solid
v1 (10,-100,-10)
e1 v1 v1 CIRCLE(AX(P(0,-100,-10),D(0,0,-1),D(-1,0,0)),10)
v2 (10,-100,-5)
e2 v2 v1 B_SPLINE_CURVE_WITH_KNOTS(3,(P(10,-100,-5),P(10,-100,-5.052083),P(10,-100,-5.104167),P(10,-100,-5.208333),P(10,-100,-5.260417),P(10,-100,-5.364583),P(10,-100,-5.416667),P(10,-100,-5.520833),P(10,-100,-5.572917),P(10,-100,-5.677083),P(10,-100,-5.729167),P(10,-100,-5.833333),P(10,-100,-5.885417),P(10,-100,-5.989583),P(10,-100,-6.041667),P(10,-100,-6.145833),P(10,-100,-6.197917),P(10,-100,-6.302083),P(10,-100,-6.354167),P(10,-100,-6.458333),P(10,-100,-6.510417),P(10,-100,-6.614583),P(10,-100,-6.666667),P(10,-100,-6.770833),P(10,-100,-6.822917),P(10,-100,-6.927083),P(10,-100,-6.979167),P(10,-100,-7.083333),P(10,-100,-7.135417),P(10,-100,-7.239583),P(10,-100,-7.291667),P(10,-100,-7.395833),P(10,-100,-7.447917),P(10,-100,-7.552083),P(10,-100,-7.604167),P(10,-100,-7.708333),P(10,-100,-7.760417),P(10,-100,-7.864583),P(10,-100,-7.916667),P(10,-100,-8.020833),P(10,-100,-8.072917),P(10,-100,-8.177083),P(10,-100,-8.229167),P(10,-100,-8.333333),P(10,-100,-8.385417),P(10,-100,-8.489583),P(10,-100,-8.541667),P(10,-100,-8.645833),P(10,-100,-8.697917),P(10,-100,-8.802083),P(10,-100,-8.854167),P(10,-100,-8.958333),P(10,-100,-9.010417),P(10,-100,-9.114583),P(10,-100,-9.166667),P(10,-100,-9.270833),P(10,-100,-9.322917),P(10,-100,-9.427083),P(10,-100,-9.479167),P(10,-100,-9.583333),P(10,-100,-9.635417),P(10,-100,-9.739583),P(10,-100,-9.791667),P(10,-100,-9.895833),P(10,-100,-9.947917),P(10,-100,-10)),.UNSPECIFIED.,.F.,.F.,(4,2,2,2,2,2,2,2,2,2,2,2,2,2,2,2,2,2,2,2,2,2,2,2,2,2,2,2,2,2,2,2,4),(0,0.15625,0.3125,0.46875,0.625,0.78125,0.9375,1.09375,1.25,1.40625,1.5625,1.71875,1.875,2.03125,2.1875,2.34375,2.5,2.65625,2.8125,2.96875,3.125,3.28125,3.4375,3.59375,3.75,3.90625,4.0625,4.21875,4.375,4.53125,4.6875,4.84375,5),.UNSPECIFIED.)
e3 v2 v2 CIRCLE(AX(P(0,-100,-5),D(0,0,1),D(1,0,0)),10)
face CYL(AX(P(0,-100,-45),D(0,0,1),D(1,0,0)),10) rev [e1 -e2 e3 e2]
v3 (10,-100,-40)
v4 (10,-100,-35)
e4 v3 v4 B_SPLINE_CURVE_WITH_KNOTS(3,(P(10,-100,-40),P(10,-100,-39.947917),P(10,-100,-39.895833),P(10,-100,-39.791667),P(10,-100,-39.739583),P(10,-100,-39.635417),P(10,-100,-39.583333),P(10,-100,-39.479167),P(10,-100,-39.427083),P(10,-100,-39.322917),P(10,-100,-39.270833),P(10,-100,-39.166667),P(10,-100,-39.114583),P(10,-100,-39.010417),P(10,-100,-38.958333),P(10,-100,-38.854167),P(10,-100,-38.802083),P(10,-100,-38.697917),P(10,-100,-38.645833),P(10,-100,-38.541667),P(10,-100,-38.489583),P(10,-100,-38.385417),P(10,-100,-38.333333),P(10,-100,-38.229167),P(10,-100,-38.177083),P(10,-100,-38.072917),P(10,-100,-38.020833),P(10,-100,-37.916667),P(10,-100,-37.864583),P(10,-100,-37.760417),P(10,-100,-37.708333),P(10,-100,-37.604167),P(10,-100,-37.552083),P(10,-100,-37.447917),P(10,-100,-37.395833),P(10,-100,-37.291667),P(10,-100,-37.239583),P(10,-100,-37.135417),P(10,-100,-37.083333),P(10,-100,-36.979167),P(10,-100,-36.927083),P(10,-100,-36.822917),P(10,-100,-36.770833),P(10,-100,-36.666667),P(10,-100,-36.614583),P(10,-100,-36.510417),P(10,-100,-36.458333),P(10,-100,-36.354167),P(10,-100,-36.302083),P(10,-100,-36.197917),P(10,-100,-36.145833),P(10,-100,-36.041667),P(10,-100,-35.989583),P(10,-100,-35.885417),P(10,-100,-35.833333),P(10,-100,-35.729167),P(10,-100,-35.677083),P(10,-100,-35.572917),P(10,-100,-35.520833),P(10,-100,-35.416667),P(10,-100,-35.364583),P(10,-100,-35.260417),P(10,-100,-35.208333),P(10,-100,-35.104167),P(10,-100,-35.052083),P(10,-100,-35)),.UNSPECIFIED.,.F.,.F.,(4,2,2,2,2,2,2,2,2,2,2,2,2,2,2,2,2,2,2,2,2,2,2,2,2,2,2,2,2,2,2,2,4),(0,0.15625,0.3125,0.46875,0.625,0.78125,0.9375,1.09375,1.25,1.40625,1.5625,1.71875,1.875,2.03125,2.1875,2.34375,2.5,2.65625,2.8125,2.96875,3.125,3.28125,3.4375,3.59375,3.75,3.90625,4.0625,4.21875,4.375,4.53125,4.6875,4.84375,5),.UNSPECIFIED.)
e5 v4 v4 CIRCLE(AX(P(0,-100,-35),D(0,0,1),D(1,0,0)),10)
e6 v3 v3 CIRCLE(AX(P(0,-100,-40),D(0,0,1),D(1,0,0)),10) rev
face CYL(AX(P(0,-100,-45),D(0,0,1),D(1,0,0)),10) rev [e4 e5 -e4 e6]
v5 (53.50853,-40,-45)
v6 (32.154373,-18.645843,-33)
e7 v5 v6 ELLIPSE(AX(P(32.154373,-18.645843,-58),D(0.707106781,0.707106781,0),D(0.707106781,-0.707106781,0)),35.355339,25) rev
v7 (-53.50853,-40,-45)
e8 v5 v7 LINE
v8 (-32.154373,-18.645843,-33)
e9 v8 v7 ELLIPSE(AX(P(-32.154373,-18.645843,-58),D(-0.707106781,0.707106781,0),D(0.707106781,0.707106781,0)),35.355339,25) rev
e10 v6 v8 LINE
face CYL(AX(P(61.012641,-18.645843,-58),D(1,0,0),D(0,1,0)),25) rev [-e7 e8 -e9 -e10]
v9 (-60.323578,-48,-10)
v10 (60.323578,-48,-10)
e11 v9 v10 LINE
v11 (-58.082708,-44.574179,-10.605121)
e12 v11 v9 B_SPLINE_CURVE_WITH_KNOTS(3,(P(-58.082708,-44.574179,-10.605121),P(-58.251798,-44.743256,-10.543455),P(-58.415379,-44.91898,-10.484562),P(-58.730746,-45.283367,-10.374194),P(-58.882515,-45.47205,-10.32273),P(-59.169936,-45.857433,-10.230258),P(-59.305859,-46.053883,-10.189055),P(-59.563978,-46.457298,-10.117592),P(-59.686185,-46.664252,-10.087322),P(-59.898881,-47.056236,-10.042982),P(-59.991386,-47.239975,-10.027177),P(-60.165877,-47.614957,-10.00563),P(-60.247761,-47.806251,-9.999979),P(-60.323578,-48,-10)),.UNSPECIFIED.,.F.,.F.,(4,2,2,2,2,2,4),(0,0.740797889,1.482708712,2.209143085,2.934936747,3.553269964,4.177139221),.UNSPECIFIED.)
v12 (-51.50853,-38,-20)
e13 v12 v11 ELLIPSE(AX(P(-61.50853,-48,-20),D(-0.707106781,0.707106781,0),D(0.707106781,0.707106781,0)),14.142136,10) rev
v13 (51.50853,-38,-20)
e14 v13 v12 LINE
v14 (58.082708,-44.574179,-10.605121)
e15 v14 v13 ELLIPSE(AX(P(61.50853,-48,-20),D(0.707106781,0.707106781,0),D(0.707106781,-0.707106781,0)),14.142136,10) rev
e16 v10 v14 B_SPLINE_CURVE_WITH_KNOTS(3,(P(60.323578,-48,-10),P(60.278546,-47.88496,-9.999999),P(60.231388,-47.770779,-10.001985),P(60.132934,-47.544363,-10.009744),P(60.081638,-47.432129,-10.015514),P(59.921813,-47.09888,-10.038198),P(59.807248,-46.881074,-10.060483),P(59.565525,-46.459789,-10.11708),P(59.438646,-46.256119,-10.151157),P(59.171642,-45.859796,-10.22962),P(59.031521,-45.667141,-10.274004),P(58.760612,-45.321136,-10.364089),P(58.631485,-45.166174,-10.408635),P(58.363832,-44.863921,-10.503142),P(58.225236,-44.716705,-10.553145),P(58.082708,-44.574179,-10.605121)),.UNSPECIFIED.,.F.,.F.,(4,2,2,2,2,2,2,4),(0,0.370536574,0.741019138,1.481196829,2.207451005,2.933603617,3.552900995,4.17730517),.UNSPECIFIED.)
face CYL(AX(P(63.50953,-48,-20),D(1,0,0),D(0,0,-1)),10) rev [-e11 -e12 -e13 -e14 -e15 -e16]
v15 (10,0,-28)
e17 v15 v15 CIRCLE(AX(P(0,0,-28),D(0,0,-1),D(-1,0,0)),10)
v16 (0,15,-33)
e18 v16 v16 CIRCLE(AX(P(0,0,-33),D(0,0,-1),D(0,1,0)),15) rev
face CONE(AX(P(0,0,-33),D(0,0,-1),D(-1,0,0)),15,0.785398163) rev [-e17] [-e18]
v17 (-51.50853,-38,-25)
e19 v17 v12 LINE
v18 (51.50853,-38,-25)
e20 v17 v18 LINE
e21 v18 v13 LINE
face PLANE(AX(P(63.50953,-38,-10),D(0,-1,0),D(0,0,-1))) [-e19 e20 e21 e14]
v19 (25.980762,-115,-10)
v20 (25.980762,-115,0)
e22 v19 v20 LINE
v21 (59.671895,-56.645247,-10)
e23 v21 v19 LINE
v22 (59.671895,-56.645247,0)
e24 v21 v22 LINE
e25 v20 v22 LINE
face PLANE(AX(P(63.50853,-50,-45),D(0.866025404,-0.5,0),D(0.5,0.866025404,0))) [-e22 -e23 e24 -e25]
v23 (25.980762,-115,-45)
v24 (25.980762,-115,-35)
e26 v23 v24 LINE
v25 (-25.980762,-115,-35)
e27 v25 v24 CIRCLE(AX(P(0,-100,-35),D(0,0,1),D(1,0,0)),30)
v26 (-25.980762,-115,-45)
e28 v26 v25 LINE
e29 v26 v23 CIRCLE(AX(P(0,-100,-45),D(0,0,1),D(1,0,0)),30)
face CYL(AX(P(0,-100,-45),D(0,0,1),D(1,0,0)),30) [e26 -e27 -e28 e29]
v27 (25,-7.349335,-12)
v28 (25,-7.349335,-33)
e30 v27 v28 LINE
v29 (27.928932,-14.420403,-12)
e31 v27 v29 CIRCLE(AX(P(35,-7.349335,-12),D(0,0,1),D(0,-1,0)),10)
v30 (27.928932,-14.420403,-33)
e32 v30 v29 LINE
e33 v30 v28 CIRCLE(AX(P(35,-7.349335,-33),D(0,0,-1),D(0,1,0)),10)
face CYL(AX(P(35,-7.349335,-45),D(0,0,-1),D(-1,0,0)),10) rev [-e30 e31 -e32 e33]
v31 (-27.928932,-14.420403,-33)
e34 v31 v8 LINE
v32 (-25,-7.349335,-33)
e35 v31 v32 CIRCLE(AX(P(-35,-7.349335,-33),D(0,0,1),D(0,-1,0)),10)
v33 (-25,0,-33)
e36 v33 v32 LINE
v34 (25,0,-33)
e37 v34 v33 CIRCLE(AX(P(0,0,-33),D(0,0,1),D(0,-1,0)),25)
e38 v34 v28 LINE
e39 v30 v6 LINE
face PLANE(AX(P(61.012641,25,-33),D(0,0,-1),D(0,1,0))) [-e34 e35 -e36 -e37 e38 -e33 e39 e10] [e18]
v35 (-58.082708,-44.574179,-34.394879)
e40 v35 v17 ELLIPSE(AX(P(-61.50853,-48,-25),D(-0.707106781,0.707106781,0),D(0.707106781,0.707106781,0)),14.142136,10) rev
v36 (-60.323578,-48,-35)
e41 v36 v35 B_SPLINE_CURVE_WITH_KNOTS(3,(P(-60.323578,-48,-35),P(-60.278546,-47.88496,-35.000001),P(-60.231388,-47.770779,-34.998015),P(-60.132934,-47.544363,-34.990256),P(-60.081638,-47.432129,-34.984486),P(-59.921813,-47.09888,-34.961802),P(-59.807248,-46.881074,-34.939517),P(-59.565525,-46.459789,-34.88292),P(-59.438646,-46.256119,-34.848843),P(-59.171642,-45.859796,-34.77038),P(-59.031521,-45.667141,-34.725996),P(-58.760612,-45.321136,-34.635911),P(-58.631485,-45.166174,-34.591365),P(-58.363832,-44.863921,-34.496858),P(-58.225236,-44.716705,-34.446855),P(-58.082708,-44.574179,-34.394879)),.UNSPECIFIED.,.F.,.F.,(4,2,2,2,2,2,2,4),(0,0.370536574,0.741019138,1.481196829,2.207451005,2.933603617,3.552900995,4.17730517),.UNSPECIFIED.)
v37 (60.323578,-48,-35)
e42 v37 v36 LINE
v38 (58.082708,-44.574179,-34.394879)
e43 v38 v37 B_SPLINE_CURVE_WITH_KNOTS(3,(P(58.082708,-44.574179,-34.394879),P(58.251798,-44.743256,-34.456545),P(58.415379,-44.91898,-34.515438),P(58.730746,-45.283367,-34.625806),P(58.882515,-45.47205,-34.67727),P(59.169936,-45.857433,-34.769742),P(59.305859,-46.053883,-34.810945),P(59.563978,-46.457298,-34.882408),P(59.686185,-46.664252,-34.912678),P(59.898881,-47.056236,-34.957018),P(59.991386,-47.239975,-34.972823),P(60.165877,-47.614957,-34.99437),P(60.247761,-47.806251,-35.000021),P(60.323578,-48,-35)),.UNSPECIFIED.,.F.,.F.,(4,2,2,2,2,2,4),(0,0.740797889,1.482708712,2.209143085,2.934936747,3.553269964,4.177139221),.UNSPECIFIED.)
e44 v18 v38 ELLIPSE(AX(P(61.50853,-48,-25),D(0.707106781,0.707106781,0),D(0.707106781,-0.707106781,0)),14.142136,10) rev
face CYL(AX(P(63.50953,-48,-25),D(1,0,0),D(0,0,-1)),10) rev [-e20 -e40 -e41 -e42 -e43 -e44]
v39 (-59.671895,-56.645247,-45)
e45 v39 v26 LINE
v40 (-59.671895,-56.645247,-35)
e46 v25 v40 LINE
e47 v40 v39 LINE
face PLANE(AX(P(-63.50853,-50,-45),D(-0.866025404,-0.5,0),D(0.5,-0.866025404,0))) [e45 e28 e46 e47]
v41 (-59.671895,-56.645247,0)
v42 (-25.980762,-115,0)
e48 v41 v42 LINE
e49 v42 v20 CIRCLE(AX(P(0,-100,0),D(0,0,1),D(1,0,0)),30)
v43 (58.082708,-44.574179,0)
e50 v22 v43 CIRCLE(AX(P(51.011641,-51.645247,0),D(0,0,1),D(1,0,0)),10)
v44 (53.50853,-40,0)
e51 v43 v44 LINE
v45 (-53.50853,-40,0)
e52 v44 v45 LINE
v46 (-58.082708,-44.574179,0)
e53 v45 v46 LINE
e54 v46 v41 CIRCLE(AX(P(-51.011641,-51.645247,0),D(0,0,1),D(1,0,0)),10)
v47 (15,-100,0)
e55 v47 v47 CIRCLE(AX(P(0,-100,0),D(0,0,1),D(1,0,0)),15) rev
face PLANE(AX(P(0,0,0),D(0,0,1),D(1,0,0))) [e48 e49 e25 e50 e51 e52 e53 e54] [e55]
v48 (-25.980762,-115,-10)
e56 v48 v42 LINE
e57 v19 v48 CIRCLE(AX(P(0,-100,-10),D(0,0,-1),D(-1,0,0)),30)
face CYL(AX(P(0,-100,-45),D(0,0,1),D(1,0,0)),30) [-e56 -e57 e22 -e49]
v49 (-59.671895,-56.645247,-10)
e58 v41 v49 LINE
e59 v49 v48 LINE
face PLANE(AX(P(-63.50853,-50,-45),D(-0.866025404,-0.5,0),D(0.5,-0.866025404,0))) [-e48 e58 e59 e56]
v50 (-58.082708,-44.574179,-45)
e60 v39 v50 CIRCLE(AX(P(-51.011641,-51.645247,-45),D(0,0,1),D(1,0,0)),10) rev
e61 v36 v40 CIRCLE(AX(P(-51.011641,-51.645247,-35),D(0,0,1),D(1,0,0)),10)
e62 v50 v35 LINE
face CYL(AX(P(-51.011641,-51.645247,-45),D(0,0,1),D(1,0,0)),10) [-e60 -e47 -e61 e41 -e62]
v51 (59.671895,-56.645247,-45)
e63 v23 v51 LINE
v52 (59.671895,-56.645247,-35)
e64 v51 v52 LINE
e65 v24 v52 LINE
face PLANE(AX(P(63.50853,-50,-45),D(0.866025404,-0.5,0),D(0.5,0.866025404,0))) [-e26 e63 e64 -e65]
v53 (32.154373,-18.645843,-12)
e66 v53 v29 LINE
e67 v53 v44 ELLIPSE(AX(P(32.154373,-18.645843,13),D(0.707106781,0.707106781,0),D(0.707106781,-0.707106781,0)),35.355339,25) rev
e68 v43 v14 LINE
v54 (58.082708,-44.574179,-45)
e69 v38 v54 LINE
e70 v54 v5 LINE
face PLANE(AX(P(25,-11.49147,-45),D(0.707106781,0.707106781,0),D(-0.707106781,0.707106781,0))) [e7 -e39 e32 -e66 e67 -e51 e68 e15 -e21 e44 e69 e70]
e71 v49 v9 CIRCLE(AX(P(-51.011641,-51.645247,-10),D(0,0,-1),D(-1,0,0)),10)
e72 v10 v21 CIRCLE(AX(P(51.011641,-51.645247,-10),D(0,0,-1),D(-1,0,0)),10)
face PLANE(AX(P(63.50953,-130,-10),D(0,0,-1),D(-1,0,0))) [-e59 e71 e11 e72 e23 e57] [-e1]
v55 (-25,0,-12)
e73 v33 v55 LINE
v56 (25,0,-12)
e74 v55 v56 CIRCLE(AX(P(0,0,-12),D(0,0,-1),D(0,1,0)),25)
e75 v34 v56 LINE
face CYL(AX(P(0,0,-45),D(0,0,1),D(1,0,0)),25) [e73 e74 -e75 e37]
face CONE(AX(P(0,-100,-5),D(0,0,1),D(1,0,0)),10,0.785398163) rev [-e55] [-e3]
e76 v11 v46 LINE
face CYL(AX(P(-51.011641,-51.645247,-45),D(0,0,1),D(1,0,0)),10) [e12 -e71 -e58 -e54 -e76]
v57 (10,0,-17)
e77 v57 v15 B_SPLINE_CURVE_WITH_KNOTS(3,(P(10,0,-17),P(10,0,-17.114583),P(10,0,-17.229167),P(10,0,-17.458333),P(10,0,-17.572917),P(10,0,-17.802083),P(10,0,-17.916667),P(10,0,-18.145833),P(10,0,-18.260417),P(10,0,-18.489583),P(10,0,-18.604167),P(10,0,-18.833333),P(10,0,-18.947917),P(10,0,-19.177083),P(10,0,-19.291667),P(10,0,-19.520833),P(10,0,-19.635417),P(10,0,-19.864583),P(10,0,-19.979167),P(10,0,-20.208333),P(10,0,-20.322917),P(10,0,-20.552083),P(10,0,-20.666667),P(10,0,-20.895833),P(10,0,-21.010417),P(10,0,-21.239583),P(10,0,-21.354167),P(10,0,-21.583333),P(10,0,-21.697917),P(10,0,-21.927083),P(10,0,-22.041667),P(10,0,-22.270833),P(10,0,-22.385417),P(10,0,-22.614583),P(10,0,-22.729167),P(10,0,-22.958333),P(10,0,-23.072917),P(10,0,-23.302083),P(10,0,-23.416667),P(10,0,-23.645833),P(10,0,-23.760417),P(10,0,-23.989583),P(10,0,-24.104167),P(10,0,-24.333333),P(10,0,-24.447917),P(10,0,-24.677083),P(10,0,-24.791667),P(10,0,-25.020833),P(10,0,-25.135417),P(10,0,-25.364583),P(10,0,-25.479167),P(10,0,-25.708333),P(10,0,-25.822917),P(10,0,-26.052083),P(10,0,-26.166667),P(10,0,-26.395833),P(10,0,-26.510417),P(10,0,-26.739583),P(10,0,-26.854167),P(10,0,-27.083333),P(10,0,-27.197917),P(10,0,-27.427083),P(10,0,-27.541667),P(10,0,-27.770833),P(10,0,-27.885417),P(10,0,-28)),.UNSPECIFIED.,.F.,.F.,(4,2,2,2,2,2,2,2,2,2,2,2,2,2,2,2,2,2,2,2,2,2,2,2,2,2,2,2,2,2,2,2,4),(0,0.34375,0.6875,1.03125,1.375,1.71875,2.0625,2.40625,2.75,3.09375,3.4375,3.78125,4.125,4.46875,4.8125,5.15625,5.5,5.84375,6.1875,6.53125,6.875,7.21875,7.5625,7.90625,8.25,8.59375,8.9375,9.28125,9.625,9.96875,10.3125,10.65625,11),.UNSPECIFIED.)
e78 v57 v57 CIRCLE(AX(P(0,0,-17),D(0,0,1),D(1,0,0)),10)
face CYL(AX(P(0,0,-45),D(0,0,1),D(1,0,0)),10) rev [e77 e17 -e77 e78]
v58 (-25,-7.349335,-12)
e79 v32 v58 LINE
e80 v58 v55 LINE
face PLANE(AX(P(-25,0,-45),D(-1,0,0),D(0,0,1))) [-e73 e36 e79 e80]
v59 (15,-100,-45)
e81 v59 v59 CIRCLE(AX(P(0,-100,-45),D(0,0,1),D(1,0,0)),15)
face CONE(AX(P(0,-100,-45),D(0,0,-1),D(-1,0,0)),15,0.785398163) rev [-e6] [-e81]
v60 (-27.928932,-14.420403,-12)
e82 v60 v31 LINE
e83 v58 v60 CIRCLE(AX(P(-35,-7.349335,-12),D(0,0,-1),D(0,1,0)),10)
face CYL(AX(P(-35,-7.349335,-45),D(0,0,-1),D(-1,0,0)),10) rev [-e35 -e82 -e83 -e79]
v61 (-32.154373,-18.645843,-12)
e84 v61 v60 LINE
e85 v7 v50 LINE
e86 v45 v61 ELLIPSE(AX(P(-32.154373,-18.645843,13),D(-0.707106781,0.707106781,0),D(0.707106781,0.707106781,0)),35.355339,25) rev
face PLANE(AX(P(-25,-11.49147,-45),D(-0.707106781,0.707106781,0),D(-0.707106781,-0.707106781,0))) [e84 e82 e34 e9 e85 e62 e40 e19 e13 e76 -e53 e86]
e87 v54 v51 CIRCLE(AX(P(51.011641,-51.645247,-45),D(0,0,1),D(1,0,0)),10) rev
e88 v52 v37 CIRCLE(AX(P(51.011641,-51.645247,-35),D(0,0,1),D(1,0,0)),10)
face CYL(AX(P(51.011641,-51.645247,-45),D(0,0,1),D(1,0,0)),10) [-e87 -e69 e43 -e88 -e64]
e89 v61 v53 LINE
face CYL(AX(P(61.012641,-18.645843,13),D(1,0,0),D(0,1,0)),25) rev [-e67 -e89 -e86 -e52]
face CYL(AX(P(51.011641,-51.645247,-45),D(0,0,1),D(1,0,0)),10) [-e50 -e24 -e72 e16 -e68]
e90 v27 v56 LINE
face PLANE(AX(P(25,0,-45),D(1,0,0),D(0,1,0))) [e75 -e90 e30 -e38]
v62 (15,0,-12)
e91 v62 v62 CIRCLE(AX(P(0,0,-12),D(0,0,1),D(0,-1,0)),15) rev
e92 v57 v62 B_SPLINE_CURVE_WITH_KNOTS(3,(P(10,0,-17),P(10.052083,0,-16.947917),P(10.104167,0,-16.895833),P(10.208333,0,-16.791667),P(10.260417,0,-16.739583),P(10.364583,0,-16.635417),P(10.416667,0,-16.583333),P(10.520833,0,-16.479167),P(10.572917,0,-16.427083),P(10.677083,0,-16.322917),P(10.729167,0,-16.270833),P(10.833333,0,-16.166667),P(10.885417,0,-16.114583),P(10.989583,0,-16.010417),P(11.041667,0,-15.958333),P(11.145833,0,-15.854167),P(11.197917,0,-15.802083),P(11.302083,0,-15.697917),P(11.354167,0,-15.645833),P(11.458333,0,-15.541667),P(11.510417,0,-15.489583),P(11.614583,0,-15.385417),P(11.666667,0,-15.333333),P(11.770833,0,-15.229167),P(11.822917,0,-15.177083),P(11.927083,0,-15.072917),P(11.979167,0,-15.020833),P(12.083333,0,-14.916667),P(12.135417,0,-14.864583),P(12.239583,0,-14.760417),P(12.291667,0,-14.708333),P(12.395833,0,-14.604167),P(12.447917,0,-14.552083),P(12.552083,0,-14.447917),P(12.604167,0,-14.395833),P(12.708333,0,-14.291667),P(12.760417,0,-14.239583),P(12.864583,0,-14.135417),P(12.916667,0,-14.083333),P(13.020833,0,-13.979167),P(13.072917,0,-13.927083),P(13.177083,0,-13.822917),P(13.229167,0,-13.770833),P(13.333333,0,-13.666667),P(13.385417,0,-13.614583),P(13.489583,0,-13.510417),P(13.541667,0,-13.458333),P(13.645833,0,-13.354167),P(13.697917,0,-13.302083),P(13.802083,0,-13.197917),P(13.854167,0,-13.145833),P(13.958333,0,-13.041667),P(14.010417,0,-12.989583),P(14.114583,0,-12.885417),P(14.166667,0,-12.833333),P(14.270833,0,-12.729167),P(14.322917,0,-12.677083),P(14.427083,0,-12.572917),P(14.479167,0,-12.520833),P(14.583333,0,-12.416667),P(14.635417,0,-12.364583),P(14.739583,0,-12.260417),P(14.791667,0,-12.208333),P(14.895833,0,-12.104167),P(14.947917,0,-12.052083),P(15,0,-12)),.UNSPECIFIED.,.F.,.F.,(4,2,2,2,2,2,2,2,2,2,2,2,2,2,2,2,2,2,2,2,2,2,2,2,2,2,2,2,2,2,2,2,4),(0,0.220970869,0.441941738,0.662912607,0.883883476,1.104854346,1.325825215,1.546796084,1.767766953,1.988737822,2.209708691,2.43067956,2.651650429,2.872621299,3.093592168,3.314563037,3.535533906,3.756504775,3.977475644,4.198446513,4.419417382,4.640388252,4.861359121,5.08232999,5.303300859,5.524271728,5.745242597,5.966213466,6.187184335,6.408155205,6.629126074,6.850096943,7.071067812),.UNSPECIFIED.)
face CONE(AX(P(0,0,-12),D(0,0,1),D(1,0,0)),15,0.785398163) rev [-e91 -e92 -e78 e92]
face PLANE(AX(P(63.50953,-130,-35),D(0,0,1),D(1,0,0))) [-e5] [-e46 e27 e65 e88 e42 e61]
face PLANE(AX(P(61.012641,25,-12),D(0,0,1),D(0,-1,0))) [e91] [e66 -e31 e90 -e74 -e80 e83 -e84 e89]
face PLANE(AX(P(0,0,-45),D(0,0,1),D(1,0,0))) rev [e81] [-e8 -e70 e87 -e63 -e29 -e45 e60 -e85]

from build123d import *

# Parameters (mm, degrees)
SKETCH1_R                      = 10
BOSS_EXTRUDE1_DEPTH            = 45
CUT_EXTRUDE1_REACH             = 153.52
SKETCH2_W                      = 25
SKETCH2_H                      = 92
CUT_EXTRUDE1_DIRECTION_2_REACH = 153.52
FILLET2_R                      = 10
FILLET3_R                      = 10
CUT_EXTRUDE5_REACH             = 164.244
SKETCH4_W                      = 12
SKETCH4_H                      = 65
CUT_EXTRUDE5_DIRECTION_2_REACH = 164.244
FILLET4_R                      = 25
CHAMFER1_SIZE                  = 5


with BuildPart() as part:
    # Sketch1 → Boss-Extrude1 (new body)
    with BuildSketch(Plane.XY):
        with BuildLine():
            Line((-25, 0), (-25, -11.491470389))
            Line((-25, -11.491470389), (-63.508529611, -50))
            Line((-63.508529611, -50), (-25.980762114, -115))
            ThreePointArc((-25.980762114, -115), (0, -130), (25.980762114, -115))
            Line((25.980762114, -115), (63.508529611, -50))
            Line((63.508529611, -50), (25, -11.491470389))
            Line((25, -11.491470389), (25, 0))
            ThreePointArc((25, 0), (0, 25), (-25, 0))
        make_face()
        Circle(SKETCH1_R, mode=Mode.SUBTRACT)
        with Locations((0, -100)):
            Circle(SKETCH1_R, mode=Mode.SUBTRACT)
    extrude(amount=-BOSS_EXTRUDE1_DEPTH)

    # Sketch2 → Cut-Extrude1 (cut, up to next)
    with BuildSketch(Plane(origin=(0, 0, 0), x_dir=(0, 0, -1), z_dir=(1, 0, 0)), mode=Mode.PRIVATE) as cut_extrude1_sk1:
        with Locations((22.5, -84)):
            Rectangle(SKETCH2_W, SKETCH2_H)
    cut_extrude1_tool1 = extrude(cut_extrude1_sk1.sketch, amount=-CUT_EXTRUDE1_REACH, mode=Mode.PRIVATE) & part.part
    add(cut_extrude1_tool1.solids().sort_by_distance((0, -84, -22.5))[0], mode=Mode.SUBTRACT)

    # Sketch2 → Cut-Extrude1 direction 2 (cut, up to next)
    with BuildSketch(Plane(origin=(0, 0, 0), x_dir=(0, 0, -1), z_dir=(1, 0, 0)), mode=Mode.PRIVATE) as cut_extrude1_direction_2_sk1:
        with Locations((22.5, -84)):
            Rectangle(SKETCH2_W, SKETCH2_H)
    cut_extrude1_direction_2_tool1 = extrude(cut_extrude1_direction_2_sk1.sketch, amount=CUT_EXTRUDE1_DIRECTION_2_REACH, mode=Mode.PRIVATE) & part.part
    add(cut_extrude1_direction_2_tool1.solids().sort_by_distance((0, -84, -22.5))[0], mode=Mode.SUBTRACT)

    # Fillet2
    fillet2_edges = [part.edges().sort_by_distance(p)[0] for p in [
        (25, -11.491470389, -22.5),
        (63.508529611, -50, -40),
        (-63.508529611, -50, -40),
        (-25, -11.491470389, -22.5),
        (-63.508529611, -50, -5),
        (63.508529611, -50, -5),
    ]]
    fillet(fillet2_edges, radius=FILLET2_R)

    # Fillet3
    fillet3_edges = [part.edges().sort_by_distance(p)[0] for p in [
        (0, -38, -10),
        (0, -38, -35),
    ]]
    fillet(fillet3_edges, radius=FILLET3_R)

    # Sketch4 → Cut-Extrude5 (cut, up to next)
    with BuildSketch(Plane(origin=(25, 0, 0), x_dir=(0, 0, -1), z_dir=(1, 0, 0)), mode=Mode.PRIVATE) as cut_extrude5_sk1:
        with Locations((39, -7.5)):
            Rectangle(SKETCH4_W, SKETCH4_H)
    cut_extrude5_tool1 = extrude(cut_extrude5_sk1.sketch, amount=-CUT_EXTRUDE5_REACH, mode=Mode.PRIVATE) & part.part
    # Sketch4 → Cut-Extrude5 (cut, up to next)
    with BuildSketch(Plane(origin=(25, 0, 0), x_dir=(0, 0, -1), z_dir=(1, 0, 0)), mode=Mode.PRIVATE) as cut_extrude5_sk2:
        with Locations((6, -7.5)):
            Rectangle(SKETCH4_W, SKETCH4_H)
    cut_extrude5_tool2 = extrude(cut_extrude5_sk2.sketch, amount=-CUT_EXTRUDE5_REACH, mode=Mode.PRIVATE) & part.part
    add(cut_extrude5_tool1.solids().sort_by_distance((25, -7.5, -39))[0], mode=Mode.SUBTRACT)
    add(cut_extrude5_tool2.solids().sort_by_distance((25, -7.5, -6))[0], mode=Mode.SUBTRACT)

    # Sketch4 → Cut-Extrude5 direction 2 (cut, up to next)
    with BuildSketch(Plane(origin=(25, 0, 0), x_dir=(0, 0, -1), z_dir=(1, 0, 0)), mode=Mode.PRIVATE) as cut_extrude5_direction_2_sk1:
        with Locations((39, -7.5)):
            Rectangle(SKETCH4_W, SKETCH4_H)
    cut_extrude5_direction_2_tool1 = extrude(cut_extrude5_direction_2_sk1.sketch, amount=CUT_EXTRUDE5_DIRECTION_2_REACH, mode=Mode.PRIVATE) & part.part
    # Sketch4 → Cut-Extrude5 direction 2 (cut, up to next)
    with BuildSketch(Plane(origin=(25, 0, 0), x_dir=(0, 0, -1), z_dir=(1, 0, 0)), mode=Mode.PRIVATE) as cut_extrude5_direction_2_sk2:
        with Locations((6, -7.5)):
            Rectangle(SKETCH4_W, SKETCH4_H)
    cut_extrude5_direction_2_tool2 = extrude(cut_extrude5_direction_2_sk2.sketch, amount=CUT_EXTRUDE5_DIRECTION_2_REACH, mode=Mode.PRIVATE) & part.part
    add(cut_extrude5_direction_2_tool1.solids().sort_by_distance((25, -7.5, -39))[0], mode=Mode.SUBTRACT)
    add(cut_extrude5_direction_2_tool2.solids().sort_by_distance((25, -7.5, -6))[0], mode=Mode.SUBTRACT)

    # Fillet4
    # the kernel refuses this fillet: 25 mm, written as the material it adds along each edge
    with BuildSketch(Plane(origin=(-106.893920871, -40, -33), x_dir=(0, 1, 0), z_dir=(1, 0, 0))) as fillet4_piece_1_section:
        with BuildLine():
            CenterArc((21.354156504, -25), FILLET4_R, 90, 58.667748502)
            Line((0, -12), (-0.42708313, -11.74))
            ThreePointArc((-0.42708313, -11.74), (-0.5, -6), (-0.5, 0))
            Line((-0.5, 0), (0, 0.5))
            Line((0, 0.5), (21.354156504, 0.5))
            Line((21.354156504, 0.5), (21.354156504, 0))
        make_face()
    fillet4_piece_1 = extrude(amount=213.787841742, mode=Mode.PRIVATE)
    fillet4_piece_1 = split(fillet4_piece_1, bisect_by=Plane(origin=(-24.314247143, -10.805717532, -36.275046533), z_dir=(0.7071067811865465, -0.7071067811865487, 0)), keep=Keep.TOP, mode=Mode.PRIVATE)
    fillet4_piece_1 = split(fillet4_piece_1, bisect_by=Plane(origin=(24.314247143, -10.805717532, -36.275046533), z_dir=(-0.7071067811865465, -0.7071067811865487, 0)), keep=Keep.TOP, mode=Mode.PRIVATE)
    add(fillet4_piece_1)
    with BuildSketch(Plane(origin=(-106.893920871, -40, -12), x_dir=(0, 0, 1), z_dir=(1, 0, 0))) as fillet4_piece_2_section:
        with BuildLine():
            CenterArc((25, -21.354156504), FILLET4_R, 121.332251498, 58.667748502)
            Line((0, -21.354156504), (-0.5, -21.354156504))
            Line((-0.5, -21.354156504), (-0.5, 0))
            Line((-0.5, 0), (0, 0.5))
            ThreePointArc((0, 0.5), (6, 0.5), (11.74, 0.42708313))
            Line((11.74, 0.42708313), (12, 0))
        make_face()
    fillet4_piece_2 = extrude(amount=213.787841742, mode=Mode.PRIVATE)
    fillet4_piece_2 = split(fillet4_piece_2, bisect_by=Plane(origin=(-24.314247143, -10.805717532, -8.724953467), z_dir=(0.7071067811865465, -0.7071067811865487, 0)), keep=Keep.TOP, mode=Mode.PRIVATE)
    fillet4_piece_2 = split(fillet4_piece_2, bisect_by=Plane(origin=(24.314247143, -10.805717532, -8.724953467), z_dir=(-0.7071067811865465, -0.7071067811865487, 0)), keep=Keep.TOP, mode=Mode.PRIVATE)
    add(fillet4_piece_2)

    # Chamfer1
    chamfer1_edges = [part.edges().sort_by_distance(p)[0] for p in [
        (-10, 0, -12),
        (-10, 0, -33),
        (-10, -100, -45),
        (-10, -100, 0),
    ]]
    chamfer(chamfer1_edges, length=CHAMFER1_SIZE)


solid = part.part
